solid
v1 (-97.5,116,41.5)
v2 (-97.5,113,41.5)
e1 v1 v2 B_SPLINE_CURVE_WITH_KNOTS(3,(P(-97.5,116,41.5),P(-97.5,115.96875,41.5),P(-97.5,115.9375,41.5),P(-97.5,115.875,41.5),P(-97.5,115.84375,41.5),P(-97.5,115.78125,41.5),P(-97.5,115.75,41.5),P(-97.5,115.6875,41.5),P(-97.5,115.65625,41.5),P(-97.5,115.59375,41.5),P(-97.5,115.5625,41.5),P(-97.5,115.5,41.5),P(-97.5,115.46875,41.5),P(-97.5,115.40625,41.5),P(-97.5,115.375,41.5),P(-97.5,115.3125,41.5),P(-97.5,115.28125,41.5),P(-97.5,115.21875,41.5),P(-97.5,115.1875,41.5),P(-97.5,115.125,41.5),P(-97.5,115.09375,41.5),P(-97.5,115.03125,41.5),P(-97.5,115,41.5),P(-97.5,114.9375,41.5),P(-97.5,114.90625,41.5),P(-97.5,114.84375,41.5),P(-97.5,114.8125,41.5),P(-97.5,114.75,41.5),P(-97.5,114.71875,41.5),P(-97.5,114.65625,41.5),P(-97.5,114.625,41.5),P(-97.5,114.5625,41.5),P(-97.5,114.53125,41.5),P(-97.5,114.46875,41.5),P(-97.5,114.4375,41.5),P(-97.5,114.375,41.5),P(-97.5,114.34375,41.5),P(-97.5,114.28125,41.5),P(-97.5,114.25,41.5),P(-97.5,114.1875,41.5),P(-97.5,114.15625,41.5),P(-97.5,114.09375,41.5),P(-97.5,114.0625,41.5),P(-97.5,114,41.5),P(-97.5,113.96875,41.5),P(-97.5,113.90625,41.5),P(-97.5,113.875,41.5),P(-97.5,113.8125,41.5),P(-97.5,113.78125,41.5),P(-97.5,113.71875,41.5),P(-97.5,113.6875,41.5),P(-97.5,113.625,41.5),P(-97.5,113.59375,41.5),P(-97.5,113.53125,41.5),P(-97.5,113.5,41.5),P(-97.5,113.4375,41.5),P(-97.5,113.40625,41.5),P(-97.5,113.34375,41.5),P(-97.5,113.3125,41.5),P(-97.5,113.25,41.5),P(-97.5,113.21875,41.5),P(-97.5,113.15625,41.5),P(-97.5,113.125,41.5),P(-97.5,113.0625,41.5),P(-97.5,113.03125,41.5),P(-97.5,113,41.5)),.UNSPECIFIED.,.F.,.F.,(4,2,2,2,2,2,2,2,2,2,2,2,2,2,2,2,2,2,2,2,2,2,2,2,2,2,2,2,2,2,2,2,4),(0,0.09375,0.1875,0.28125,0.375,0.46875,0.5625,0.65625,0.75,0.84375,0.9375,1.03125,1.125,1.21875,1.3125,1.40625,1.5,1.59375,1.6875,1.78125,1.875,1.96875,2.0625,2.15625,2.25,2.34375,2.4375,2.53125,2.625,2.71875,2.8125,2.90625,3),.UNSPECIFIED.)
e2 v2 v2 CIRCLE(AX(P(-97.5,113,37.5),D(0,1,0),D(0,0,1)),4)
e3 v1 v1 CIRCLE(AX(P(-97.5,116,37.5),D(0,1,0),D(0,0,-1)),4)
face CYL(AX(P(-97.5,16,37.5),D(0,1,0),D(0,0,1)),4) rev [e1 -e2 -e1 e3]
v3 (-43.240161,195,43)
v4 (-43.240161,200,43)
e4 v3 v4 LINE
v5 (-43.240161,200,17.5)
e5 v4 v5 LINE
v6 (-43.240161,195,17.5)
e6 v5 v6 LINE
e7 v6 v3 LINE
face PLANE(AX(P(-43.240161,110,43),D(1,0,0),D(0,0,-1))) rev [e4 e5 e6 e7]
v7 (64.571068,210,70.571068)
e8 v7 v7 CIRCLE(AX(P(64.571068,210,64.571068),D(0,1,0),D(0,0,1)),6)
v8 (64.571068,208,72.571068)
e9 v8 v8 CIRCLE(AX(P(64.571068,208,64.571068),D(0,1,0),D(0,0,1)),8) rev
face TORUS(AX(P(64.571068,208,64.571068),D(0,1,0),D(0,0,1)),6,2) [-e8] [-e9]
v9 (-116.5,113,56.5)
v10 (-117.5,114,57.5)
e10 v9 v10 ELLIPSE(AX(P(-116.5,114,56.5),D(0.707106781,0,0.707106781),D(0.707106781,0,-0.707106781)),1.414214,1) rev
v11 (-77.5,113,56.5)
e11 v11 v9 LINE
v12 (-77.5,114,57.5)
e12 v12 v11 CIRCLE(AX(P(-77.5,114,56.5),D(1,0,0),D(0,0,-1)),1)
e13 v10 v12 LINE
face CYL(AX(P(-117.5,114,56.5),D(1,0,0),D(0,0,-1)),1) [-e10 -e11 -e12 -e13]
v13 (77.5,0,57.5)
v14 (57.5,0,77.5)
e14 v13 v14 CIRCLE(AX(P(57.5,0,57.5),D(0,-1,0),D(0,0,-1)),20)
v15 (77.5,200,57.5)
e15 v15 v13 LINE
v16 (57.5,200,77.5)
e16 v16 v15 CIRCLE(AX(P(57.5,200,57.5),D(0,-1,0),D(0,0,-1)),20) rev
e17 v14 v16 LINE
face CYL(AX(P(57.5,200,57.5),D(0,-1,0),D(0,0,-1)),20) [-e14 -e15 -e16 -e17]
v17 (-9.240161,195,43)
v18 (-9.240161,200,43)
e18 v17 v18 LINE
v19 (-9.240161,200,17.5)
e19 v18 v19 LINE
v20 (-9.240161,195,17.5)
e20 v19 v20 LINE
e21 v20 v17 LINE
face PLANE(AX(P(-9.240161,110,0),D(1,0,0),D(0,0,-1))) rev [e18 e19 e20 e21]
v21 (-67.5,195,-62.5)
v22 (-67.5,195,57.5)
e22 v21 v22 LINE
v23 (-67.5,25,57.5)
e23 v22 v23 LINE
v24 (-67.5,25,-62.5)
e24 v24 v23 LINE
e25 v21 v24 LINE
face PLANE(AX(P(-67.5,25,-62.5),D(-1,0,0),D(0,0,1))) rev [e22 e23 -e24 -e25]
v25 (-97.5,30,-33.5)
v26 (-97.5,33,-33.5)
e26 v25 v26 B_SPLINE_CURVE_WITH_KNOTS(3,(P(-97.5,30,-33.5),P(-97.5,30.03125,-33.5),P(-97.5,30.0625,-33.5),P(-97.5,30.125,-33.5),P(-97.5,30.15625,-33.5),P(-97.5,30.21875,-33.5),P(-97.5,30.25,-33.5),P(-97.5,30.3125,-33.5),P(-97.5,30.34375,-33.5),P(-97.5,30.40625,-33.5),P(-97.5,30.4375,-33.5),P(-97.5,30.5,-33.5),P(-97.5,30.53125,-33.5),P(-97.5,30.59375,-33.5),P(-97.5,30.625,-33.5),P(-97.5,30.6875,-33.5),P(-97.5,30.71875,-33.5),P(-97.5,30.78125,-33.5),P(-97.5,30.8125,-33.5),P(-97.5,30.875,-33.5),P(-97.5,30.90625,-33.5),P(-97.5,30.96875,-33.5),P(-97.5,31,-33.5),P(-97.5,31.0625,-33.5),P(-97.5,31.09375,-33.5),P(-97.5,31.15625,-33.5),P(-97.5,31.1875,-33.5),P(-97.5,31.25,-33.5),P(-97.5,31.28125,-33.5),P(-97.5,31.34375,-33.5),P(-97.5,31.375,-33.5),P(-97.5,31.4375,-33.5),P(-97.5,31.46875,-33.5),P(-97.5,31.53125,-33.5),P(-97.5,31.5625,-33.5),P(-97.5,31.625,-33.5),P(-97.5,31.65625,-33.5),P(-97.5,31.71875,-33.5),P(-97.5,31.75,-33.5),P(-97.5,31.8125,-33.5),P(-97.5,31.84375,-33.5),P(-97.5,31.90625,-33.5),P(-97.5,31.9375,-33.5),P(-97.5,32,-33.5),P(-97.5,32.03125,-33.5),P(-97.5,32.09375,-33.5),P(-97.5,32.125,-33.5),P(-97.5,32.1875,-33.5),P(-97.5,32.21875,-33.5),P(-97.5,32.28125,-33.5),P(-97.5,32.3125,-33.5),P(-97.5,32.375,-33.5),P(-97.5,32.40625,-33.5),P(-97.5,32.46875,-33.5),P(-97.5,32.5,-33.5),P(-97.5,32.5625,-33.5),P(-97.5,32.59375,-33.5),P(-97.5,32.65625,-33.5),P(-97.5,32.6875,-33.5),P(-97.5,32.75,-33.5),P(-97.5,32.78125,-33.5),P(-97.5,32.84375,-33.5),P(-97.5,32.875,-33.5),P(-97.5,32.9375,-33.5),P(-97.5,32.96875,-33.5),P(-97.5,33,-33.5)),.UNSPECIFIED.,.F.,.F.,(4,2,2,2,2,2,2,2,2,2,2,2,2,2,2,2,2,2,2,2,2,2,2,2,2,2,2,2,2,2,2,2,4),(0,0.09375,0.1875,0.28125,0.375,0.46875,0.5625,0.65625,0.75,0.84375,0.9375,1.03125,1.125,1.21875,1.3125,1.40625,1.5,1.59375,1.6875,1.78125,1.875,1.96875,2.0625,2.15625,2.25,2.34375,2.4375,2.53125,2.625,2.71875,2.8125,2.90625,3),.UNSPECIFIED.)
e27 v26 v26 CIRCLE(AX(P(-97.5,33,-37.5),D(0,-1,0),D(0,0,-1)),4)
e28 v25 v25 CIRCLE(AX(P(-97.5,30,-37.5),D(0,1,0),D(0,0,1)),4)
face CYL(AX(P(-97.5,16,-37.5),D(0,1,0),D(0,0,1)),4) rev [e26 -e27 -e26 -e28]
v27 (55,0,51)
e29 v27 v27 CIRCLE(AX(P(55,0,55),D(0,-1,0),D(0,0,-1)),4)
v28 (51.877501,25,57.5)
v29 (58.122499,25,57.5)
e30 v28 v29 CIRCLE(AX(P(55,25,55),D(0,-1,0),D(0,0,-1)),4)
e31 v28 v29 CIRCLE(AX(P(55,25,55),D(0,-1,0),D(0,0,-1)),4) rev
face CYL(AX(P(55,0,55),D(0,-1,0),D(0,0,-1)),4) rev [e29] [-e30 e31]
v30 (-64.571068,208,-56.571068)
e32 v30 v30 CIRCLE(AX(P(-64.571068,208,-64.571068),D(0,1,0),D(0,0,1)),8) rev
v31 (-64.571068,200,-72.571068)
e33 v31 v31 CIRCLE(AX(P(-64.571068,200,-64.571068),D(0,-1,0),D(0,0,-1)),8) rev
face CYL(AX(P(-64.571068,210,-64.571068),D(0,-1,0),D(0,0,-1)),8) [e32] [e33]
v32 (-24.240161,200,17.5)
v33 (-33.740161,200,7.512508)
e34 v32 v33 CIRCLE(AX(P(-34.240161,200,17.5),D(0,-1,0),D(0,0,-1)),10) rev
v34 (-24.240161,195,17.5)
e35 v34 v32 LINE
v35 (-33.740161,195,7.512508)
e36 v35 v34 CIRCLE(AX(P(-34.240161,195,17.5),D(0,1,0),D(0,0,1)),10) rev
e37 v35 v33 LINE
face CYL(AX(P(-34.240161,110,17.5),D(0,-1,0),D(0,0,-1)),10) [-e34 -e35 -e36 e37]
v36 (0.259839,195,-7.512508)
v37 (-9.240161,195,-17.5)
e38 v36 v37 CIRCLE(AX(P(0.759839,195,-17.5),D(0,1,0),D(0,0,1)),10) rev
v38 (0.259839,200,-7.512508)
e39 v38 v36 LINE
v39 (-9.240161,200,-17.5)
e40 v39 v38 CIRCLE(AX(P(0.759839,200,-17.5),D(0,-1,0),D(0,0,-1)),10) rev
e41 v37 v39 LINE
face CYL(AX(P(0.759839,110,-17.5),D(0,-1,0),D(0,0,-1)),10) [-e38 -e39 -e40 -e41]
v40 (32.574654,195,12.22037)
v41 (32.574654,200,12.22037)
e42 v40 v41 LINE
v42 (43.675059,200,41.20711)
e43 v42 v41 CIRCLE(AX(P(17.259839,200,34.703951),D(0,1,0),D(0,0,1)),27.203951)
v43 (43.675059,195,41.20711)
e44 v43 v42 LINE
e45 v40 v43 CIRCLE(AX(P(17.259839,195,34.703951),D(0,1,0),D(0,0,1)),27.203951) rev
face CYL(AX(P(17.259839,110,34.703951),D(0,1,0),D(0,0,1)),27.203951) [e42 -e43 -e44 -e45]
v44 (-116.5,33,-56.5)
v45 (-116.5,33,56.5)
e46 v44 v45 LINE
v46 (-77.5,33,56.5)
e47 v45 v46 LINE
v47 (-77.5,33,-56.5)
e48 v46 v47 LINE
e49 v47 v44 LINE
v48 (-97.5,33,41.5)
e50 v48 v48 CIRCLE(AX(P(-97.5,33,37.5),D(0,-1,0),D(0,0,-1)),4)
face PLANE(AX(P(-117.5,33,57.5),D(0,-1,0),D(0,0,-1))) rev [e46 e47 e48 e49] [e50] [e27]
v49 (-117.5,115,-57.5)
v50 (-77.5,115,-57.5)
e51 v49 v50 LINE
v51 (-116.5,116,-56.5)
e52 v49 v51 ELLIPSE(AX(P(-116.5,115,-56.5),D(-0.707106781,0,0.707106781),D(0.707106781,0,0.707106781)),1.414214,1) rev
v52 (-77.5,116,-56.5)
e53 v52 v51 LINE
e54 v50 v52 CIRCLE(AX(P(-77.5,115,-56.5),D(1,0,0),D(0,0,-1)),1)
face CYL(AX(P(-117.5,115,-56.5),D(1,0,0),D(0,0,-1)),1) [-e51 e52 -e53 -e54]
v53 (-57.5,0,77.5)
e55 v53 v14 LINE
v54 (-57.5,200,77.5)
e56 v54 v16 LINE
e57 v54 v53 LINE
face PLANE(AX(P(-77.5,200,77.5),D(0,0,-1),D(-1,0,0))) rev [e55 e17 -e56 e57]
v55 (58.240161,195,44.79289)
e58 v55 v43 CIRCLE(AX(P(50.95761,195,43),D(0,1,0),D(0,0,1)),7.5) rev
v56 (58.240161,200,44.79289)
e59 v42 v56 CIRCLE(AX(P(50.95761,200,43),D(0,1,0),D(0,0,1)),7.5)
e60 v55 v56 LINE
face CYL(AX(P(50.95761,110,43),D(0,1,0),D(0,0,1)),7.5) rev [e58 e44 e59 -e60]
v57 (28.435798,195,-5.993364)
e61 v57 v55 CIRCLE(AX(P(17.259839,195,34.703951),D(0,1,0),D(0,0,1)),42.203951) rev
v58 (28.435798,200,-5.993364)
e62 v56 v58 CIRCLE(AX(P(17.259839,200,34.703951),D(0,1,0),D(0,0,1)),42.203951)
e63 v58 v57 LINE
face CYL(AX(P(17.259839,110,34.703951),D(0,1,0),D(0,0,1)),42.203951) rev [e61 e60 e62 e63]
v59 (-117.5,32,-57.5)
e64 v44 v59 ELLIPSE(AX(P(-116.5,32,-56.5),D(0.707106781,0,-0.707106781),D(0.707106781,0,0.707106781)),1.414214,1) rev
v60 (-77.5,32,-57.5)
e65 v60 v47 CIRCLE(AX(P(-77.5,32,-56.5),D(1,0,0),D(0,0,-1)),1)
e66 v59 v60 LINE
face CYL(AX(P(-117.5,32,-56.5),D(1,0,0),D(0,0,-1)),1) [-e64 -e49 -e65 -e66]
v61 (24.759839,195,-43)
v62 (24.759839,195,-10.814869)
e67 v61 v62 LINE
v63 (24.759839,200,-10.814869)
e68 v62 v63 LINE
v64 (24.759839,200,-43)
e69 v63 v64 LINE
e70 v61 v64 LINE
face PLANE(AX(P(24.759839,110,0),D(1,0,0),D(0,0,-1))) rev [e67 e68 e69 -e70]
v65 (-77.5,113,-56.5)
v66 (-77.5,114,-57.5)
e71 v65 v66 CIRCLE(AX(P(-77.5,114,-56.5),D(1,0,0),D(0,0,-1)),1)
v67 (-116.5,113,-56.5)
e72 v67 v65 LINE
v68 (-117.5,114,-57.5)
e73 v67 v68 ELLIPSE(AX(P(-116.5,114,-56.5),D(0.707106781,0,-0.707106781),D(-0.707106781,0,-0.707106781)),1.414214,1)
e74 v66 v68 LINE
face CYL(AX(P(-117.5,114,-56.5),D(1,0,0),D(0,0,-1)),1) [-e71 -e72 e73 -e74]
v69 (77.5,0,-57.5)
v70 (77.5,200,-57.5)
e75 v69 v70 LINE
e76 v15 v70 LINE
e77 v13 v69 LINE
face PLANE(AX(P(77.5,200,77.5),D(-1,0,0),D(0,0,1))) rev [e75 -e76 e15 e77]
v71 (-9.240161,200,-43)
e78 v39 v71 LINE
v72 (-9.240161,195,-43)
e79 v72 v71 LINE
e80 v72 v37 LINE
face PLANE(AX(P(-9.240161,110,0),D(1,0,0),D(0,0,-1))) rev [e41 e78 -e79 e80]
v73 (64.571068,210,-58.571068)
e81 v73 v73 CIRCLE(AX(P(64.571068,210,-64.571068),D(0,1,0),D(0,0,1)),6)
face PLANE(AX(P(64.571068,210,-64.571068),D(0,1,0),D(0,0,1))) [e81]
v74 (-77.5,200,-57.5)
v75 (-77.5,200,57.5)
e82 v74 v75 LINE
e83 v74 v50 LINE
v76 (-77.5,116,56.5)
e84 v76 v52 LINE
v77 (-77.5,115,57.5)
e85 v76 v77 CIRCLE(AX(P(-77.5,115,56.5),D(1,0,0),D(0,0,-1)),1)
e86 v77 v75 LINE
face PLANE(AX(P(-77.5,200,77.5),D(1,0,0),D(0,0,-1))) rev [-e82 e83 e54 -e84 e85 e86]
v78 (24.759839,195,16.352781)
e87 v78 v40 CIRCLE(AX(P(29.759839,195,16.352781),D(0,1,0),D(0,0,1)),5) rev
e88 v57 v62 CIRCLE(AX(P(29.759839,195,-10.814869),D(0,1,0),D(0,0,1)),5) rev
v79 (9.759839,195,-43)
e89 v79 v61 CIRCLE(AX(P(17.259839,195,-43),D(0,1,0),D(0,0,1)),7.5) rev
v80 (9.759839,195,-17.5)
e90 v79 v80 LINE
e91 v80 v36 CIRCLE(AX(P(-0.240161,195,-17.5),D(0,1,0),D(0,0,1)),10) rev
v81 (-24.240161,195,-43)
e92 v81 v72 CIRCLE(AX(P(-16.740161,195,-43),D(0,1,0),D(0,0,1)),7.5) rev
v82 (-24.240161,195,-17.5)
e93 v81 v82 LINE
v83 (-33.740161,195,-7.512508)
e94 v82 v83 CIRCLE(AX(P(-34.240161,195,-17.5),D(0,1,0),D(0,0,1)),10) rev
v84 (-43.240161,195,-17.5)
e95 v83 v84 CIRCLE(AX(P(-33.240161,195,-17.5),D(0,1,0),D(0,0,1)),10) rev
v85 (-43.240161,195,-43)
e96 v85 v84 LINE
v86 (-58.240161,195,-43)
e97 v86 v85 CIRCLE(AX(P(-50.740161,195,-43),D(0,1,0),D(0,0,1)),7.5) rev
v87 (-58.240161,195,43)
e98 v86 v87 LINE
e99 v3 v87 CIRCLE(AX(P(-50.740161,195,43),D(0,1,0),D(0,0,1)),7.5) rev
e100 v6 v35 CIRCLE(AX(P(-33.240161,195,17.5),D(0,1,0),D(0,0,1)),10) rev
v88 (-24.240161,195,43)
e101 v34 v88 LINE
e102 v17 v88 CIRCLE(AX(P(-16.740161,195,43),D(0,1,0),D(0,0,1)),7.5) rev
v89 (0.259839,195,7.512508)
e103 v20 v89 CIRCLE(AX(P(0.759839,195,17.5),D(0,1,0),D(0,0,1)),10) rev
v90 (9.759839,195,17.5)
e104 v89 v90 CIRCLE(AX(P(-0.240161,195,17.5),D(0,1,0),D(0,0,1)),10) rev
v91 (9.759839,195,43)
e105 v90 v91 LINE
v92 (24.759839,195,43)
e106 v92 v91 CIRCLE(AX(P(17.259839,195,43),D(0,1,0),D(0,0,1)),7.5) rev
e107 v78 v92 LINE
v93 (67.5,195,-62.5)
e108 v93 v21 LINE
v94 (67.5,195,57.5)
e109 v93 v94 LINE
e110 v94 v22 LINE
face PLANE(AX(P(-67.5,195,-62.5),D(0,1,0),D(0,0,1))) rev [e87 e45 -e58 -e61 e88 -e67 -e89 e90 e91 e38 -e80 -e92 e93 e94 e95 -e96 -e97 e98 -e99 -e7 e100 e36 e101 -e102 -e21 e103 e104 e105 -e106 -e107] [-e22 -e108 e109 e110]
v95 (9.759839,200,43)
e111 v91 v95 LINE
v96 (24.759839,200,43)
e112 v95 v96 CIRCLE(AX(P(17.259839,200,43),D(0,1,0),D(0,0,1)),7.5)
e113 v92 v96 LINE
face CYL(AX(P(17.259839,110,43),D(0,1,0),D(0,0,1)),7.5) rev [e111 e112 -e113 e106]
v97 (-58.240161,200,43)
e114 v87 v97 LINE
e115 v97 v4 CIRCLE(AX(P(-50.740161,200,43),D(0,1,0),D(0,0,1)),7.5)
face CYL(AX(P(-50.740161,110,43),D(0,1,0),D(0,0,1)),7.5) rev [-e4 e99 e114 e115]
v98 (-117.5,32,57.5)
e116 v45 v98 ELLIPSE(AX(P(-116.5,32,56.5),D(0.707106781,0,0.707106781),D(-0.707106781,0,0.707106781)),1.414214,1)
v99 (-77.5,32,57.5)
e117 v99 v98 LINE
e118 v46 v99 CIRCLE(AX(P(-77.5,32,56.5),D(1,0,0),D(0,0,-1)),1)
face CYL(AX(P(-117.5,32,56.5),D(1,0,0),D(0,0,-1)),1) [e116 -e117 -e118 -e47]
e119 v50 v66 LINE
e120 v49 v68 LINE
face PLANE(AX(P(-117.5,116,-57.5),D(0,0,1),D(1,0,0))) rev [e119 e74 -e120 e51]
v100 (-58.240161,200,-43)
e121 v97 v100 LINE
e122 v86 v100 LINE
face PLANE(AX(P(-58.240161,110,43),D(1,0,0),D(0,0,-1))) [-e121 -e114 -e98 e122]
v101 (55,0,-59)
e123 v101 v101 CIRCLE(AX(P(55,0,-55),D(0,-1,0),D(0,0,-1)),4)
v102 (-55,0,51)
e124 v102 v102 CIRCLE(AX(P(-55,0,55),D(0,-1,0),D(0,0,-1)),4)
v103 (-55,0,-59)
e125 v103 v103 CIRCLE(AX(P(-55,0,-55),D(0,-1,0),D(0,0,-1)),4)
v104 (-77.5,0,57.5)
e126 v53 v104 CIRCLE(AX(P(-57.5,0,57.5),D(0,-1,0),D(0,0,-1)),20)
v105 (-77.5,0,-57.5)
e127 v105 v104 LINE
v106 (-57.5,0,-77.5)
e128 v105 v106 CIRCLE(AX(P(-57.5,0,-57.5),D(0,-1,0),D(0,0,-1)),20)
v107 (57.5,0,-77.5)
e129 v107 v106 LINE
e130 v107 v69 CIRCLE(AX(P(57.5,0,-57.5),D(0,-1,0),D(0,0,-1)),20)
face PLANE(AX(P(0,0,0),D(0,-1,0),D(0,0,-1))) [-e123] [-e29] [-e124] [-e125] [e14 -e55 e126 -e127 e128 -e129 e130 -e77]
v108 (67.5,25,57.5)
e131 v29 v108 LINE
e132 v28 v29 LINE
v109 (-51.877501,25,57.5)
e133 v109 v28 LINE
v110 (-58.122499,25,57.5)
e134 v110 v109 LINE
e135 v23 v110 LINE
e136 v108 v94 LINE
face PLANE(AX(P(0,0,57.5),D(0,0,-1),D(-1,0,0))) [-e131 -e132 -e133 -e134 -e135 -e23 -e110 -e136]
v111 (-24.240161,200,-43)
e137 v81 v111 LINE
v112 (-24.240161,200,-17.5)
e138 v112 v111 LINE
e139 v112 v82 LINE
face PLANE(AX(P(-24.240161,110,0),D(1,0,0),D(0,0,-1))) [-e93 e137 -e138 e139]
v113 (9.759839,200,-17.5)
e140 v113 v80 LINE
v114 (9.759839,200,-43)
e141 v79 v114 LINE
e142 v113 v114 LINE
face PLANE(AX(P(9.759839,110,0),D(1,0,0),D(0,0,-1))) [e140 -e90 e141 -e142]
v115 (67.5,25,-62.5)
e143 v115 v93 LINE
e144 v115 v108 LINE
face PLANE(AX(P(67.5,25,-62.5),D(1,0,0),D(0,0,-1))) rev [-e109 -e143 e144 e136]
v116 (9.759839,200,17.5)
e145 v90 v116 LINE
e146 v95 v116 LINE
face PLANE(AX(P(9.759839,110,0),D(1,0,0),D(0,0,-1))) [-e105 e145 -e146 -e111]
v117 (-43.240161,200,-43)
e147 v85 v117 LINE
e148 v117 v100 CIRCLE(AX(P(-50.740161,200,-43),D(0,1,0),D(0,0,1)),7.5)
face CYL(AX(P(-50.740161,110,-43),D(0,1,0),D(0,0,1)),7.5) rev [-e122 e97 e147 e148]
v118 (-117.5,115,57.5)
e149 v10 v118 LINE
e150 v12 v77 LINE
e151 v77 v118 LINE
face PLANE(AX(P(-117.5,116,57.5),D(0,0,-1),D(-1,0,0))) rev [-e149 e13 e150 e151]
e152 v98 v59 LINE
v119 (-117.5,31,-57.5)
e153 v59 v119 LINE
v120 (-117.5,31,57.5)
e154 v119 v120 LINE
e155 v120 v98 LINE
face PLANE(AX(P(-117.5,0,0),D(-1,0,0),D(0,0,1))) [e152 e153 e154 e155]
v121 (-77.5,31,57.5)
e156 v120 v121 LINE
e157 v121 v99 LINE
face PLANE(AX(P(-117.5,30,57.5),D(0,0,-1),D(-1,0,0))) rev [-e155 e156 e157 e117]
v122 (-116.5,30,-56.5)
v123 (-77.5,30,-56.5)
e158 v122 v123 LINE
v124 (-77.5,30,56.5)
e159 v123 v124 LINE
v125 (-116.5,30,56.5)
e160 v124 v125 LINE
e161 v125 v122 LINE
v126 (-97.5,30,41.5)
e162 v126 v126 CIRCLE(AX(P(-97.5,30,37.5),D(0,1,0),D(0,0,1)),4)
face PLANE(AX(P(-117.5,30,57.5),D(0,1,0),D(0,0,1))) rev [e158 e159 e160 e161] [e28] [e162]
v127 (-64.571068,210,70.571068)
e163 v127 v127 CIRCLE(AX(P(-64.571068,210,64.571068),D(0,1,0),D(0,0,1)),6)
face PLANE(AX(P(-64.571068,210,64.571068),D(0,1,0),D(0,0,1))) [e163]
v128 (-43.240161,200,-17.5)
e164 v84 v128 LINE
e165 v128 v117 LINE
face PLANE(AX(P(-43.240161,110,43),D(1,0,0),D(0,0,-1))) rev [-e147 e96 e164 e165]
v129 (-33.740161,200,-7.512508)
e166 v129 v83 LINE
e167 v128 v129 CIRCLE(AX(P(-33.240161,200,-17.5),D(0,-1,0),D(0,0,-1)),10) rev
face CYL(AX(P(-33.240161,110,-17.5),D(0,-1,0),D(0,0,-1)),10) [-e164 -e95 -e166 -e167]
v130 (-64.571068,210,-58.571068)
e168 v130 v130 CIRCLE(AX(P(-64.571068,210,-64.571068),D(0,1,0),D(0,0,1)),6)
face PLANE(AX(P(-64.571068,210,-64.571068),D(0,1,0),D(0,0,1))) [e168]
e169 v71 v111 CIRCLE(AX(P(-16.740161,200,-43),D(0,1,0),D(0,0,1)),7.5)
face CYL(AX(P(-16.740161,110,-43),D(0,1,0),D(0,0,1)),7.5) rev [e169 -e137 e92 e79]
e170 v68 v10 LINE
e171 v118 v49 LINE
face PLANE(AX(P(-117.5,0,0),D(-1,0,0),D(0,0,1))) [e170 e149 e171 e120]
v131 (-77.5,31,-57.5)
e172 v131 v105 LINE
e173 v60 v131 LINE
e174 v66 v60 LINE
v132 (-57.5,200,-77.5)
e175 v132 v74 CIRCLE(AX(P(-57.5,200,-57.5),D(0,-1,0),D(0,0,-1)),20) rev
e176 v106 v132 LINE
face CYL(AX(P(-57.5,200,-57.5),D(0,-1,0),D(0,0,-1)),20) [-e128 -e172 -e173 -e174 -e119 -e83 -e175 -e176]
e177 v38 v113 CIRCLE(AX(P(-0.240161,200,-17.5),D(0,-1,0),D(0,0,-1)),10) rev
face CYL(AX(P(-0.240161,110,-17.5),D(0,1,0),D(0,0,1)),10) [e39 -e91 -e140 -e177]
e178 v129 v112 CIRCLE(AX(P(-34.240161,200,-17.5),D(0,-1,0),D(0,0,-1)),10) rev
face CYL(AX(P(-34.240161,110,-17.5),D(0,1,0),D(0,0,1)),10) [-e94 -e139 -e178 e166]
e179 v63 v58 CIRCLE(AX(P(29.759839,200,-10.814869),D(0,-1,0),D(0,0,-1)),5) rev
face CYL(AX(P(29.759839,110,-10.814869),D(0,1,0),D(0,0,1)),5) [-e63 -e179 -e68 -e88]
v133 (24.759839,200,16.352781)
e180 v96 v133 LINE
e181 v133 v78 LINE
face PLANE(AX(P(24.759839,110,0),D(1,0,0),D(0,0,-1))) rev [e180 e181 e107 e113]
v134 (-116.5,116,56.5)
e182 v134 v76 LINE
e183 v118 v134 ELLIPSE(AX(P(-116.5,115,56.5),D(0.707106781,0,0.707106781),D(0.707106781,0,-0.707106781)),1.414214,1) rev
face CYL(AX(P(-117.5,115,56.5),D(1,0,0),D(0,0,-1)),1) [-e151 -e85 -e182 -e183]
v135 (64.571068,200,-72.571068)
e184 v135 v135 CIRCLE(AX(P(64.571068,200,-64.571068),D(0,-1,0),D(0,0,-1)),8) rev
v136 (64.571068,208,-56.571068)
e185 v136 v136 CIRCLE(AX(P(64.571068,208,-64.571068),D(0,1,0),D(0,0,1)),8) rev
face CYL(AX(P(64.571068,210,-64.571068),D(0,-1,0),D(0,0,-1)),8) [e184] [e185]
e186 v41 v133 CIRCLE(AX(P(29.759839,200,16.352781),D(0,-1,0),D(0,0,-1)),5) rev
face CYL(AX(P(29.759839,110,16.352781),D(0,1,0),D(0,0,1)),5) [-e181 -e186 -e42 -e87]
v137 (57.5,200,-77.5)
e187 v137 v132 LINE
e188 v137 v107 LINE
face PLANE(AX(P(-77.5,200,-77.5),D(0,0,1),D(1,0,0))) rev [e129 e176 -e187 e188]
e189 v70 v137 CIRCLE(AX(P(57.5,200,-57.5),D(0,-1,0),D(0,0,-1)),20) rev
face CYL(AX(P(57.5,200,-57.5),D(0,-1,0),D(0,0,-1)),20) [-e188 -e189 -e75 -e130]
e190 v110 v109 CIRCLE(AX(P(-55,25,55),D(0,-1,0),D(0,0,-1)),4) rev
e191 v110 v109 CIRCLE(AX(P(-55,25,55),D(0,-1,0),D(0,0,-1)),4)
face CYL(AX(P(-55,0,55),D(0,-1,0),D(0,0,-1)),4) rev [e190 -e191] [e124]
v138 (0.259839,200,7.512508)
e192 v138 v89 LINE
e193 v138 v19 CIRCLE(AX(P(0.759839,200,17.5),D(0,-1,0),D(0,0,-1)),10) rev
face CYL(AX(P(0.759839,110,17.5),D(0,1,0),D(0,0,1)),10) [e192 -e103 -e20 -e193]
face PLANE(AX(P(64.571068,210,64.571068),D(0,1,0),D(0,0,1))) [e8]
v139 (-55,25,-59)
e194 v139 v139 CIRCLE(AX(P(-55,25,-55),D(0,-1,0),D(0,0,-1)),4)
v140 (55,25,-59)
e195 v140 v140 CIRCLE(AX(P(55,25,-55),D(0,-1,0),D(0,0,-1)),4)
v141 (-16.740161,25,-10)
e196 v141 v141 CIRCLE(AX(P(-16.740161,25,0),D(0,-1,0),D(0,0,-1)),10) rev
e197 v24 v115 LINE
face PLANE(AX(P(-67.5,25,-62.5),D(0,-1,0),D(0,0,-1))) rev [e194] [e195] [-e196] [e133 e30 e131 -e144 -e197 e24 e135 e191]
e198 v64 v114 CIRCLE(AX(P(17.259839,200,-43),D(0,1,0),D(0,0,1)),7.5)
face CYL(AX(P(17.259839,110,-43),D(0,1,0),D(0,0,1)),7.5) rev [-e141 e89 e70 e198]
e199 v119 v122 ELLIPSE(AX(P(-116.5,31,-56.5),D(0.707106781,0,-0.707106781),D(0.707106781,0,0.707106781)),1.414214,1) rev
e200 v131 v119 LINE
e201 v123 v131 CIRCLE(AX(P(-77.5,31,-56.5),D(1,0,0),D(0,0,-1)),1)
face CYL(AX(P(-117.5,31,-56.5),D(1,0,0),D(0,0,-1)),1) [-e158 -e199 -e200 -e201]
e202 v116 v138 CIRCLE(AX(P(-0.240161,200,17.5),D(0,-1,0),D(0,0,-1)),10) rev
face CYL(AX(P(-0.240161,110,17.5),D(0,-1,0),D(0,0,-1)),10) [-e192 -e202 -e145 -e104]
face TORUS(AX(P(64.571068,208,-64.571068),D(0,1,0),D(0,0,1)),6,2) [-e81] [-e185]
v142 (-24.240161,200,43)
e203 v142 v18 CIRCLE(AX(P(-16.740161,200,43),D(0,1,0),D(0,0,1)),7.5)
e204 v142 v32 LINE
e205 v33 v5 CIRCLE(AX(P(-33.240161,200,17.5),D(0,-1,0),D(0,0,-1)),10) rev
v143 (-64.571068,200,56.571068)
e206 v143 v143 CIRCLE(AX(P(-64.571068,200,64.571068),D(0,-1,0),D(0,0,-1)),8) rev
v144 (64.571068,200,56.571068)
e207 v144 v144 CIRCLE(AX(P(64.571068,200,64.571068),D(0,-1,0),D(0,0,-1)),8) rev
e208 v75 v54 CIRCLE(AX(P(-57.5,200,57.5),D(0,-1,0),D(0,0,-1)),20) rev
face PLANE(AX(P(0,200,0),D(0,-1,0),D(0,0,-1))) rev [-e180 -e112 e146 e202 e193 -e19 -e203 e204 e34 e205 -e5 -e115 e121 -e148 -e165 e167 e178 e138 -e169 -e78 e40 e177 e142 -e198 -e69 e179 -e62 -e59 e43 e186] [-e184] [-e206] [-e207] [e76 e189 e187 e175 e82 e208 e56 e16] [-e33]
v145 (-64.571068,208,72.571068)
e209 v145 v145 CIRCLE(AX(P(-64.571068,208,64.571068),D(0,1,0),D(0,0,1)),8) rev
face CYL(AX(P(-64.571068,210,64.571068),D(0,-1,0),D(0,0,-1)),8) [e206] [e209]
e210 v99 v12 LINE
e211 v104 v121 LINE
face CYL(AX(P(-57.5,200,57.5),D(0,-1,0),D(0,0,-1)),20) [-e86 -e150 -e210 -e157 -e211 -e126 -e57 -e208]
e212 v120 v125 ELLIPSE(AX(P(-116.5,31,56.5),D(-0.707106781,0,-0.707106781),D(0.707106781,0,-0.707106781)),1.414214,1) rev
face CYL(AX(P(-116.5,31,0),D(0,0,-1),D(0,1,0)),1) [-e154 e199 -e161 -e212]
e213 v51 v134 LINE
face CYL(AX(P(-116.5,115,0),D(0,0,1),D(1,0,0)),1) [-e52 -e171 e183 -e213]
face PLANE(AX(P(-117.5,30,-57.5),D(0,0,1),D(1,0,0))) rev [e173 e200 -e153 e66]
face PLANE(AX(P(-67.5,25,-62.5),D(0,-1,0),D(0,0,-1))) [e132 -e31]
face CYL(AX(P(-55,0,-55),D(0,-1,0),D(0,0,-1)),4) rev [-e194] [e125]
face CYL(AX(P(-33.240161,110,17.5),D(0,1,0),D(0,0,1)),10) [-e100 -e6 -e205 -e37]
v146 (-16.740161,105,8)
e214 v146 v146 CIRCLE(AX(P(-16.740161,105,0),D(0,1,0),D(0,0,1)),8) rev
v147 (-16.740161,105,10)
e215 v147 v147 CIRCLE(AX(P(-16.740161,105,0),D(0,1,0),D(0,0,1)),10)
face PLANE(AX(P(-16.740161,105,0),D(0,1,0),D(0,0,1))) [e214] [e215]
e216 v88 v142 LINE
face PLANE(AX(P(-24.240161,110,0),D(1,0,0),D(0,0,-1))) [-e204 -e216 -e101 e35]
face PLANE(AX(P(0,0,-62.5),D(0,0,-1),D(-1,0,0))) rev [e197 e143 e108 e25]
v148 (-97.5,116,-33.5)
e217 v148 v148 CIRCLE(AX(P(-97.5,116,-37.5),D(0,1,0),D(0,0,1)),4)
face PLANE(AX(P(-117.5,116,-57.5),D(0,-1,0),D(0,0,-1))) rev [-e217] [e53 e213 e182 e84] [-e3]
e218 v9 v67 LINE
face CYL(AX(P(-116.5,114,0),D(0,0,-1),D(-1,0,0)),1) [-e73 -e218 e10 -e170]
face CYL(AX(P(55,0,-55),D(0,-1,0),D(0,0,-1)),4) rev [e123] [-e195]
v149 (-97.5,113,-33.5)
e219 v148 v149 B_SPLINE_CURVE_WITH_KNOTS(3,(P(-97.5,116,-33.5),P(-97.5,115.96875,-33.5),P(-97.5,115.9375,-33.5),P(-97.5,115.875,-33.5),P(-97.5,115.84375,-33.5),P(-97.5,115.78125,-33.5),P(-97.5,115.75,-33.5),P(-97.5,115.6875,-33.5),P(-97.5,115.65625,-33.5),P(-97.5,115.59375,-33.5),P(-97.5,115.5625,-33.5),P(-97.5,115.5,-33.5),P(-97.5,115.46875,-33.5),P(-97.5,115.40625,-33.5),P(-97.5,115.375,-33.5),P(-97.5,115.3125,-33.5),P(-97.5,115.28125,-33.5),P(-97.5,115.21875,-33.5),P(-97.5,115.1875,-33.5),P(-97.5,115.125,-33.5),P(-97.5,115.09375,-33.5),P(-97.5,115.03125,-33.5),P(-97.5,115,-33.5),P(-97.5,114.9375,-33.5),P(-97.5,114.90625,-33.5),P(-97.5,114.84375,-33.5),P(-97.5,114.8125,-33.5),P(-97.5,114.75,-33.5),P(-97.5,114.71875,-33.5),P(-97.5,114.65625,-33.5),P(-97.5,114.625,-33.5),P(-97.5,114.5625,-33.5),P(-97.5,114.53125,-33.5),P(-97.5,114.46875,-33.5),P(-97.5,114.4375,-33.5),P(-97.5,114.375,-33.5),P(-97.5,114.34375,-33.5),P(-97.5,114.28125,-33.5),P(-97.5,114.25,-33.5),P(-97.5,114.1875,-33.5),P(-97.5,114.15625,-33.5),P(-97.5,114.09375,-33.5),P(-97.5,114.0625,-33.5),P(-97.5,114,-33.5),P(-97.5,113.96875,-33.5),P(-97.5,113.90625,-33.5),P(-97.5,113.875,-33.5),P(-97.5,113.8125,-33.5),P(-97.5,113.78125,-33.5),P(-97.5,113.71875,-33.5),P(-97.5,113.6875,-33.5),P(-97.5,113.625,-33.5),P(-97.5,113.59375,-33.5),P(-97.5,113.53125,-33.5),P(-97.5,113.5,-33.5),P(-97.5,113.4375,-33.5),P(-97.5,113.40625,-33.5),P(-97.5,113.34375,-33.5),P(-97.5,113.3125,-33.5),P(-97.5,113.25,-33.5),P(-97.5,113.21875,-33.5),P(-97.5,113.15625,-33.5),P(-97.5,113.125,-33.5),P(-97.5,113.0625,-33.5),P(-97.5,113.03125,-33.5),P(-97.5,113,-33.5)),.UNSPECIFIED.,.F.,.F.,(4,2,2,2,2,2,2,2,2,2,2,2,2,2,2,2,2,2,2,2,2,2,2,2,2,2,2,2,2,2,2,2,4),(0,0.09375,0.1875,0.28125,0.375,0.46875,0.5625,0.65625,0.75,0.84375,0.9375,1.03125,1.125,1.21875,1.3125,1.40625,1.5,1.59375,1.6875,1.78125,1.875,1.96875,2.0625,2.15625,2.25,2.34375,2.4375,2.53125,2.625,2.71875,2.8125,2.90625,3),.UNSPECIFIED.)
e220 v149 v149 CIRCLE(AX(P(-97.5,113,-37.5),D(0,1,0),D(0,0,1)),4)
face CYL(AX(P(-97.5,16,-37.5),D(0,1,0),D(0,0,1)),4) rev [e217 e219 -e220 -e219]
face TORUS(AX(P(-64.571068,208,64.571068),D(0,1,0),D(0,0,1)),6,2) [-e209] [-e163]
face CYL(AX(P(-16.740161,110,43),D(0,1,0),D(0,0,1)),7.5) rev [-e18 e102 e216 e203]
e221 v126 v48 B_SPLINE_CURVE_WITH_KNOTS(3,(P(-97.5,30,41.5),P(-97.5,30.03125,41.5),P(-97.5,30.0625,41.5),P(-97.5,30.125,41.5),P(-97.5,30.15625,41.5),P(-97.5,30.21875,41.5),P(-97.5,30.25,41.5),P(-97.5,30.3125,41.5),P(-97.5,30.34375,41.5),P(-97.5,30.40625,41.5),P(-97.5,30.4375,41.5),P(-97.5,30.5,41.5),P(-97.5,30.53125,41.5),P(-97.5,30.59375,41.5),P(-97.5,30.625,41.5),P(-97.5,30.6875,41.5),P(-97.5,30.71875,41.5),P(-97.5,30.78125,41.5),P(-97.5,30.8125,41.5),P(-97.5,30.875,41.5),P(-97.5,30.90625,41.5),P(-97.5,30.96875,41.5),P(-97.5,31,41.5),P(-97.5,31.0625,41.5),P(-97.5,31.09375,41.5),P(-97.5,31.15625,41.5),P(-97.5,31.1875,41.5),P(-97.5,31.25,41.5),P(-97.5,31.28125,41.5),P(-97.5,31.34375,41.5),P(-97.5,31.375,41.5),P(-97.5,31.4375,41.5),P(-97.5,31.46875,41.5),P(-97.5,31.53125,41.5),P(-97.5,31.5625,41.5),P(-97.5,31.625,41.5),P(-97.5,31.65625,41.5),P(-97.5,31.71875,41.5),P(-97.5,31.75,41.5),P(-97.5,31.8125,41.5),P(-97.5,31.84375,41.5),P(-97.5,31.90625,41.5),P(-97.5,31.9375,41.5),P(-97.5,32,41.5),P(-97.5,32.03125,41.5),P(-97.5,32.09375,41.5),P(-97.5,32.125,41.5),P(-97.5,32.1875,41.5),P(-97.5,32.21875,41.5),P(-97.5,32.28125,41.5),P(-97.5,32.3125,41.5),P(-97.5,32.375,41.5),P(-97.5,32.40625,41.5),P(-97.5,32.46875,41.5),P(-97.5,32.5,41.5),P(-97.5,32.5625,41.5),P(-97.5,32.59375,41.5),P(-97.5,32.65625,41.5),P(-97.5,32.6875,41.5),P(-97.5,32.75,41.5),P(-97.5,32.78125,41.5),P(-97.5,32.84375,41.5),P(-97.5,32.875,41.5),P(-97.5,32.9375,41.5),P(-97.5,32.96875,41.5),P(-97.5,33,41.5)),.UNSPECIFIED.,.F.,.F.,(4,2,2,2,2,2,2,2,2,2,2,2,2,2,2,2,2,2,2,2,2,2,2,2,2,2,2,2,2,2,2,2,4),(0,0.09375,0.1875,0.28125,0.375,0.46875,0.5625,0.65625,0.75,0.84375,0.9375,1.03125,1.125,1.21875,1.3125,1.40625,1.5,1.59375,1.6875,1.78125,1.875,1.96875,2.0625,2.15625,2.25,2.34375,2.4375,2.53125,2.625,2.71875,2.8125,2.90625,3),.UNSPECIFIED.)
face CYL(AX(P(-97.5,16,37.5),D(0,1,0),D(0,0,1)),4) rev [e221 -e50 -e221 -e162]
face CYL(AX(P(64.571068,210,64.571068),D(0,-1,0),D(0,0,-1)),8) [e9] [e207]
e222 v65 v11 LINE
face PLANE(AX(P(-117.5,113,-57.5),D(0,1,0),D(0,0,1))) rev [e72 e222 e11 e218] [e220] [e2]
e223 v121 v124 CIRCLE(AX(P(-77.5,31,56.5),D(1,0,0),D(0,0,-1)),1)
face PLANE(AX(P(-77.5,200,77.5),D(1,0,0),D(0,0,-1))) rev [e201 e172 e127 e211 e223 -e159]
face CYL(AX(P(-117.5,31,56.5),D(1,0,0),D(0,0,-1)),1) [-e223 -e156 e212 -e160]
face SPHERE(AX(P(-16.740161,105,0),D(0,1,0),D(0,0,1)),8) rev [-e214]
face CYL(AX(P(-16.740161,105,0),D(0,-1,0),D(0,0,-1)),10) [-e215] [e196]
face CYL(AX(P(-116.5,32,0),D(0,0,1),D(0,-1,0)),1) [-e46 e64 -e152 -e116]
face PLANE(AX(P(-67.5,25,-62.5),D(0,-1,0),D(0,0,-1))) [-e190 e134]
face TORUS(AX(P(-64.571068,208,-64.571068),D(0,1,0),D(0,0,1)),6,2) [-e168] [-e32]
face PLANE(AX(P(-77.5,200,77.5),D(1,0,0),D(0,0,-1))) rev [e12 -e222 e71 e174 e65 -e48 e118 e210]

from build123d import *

# Parameters (mm, degrees)
SZKIC1_W                       = 155
SZKIC1_H                       = 155
DODANIE_WYCI_GNI_CIE1_DEPTH    = 200
SZKIC2_W                       = 19
SZKIC2_H                       = 15
SZKIC2_W_2                     = 15
WYTNIJ_WYCI_GNI_CIE1_DEPTH     = 90
ZAOKR_GLENIE1_R                = 20
SZKIC4_R                       = 8
DODANIE_WYCI_GNI_CIE2_DEPTH    = 10
ZAOKR_GLENIE2_R                = 2
SZKIC5_W                       = 135
SZKIC5_H                       = 170
WYTNIJ_WYCI_GNI_CIE2_DEPTH     = 120
SZKIC6_R                       = 10
DODANIE_WYCI_GNI_CIE3_DEPTH    = 80
SZKIC8_W                       = 115
SZKIC8_H                       = 3
DODANIE_WYCI_GNI_CIE4_DEPTH    = 40
SZKIC9_R                       = 4
WYTNIJ_WYCI_GNI_CIE3_DEPTH     = 100
ZAOKR_GLENIE3_R                = 1
OTWORY_USTALAJ_CE_8_0MM1_D     = 8
OTWORY_USTALAJ_CE_8_0MM1_DEPTH = 25
ZAOKR_GLENIE4_R                = 10
ZAOKR_GLENIE5_R                = 5


with BuildPart() as part:
    # Szkic1 → Dodanie-wyciągnięcie1 (new body)
    with BuildSketch(Plane(origin=(0, 0, 0), x_dir=(1, 0, 0), z_dir=(0, 1, 0))):
        Rectangle(SZKIC1_W, SZKIC1_H)
    extrude(amount=DODANIE_WYCI_GNI_CIE1_DEPTH)

    # Szkic2 → Wytnij-wyciągnięcie1 (cut)
    with BuildSketch(Plane(origin=(0, 200, 0), x_dir=(1, 0, 0), z_dir=(0, 1, 0))):
        with BuildLine():
            Line((-58.240160679, 43), (-58.240160679, -43))
            ThreePointArc((-58.240160679, -43), (-50.740160679, -50.5), (-43.240160679, -43))
            Line((-43.240160679, -43), (-43.240160679, -7.5))
            Line((-43.240160679, -7.5), (-43.240160679, 7.5))
            Line((-43.240160679, 7.5), (-43.240160679, 43))
            ThreePointArc((-43.240160679, 43), (-50.740160679, 50.5), (-58.240160679, 43))
        make_face()
        with Locations((-33.740160679, 0)):
            Rectangle(SZKIC2_W, SZKIC2_H)
        with BuildLine():
            Line((-9.240160679, -7.5), (-24.240160679, -7.5))
            Line((-24.240160679, -7.5), (-24.240160679, -43))
            ThreePointArc((-24.240160679, -43), (-16.740160679, -50.5), (-9.240160679, -43))
            Line((-9.240160679, -43), (-9.240160679, -7.5))
        make_face()
        with Locations((-16.740160679, 0)):
            Rectangle(SZKIC2_W_2, SZKIC2_H)
        with BuildLine():
            Line((-24.240160679, 43), (-24.240160679, 7.5))
            Line((-24.240160679, 7.5), (-9.240160679, 7.5))
            Line((-9.240160679, 7.5), (-9.240160679, 43))
            ThreePointArc((-9.240160679, 43), (-16.740160679, 50.5), (-24.240160679, 43))
        make_face()
        Polygon((-9.240160679, 7.5), (-9.240160679, -7.5), (9.759839321, -7.5), (9.759839321, -4.6e-08), (9.759839321, 7.5), align=None)
        with BuildLine():
            Line((17.259839321, -7.5), (9.759839321, -7.5))
            Line((9.759839321, -7.5), (9.759839321, -43))
            ThreePointArc((9.759839321, -43), (17.259839321, -50.5), (24.759839321, -43))
            Line((24.759839321, -43), (24.759839321, -8.554286585))
            ThreePointArc((24.759839321, -8.554286585), (21.046708747, -7.764861006), (17.259839321, -7.5))
        make_face()
        with BuildLine():
            Line((9.759839321, -4.6e-08), (9.759839321, -7.5))
            Line((9.759839321, -7.5), (17.259839321, -7.5))
            ThreePointArc((17.259839321, -7.5), (11.956538478, -5.303300875), (9.759839321, -4.6e-08))
        make_face()
        with BuildLine():
            Line((17.259839321, 7.5), (9.759839321, 7.5))
            Line((9.759839321, 7.5), (9.759839321, -4.6e-08))
            ThreePointArc((9.759839321, -4.6e-08), (11.956538445, 5.303300843), (17.259839321, 7.5))
        make_face()
        with BuildLine():
            Line((9.759839321, 43), (9.759839321, 7.5))
            Line((9.759839321, 7.5), (17.259839321, 7.5))
            ThreePointArc((17.259839321, 7.5), (21.024851006, 7.331726309), (24.759839321, 6.828247104))
            Line((24.759839321, 6.828247104), (24.759839321, 43))
            ThreePointArc((24.759839321, 43), (17.259839321, 50.5), (9.759839321, 43))
        make_face()
        with BuildLine():
            ThreePointArc((17.259839321, 7.5), (11.956538445, 5.303300843), (9.759839321, -4.6e-08))
            ThreePointArc((9.759839321, -4.6e-08), (11.956538478, -5.303300875), (17.259839321, -7.5))
            Line((17.259839321, -7.5), (17.259839321, 7.5))
        make_face()
        with BuildLine():
            Line((17.259839321, 7.5), (17.259839321, -7.5))
            ThreePointArc((17.259839321, -7.5), (21.046708747, -7.764861006), (24.759839321, -8.554286585))
            Line((24.759839321, -8.554286585), (24.759839321, 6.828247104))
            ThreePointArc((24.759839321, 6.828247104), (21.024851006, 7.331726309), (17.259839321, 7.5))
        make_face()
        with BuildLine():
            Line((24.759839321, 6.828247104), (24.759839321, -8.554286585))
            ThreePointArc((24.759839321, -8.554286585), (40.799428369, -21.067870737), (43.675059249, -41.207109854))
            ThreePointArc((43.675059249, -41.207109854), (49.164719818, -50.282550715), (58.240160679, -44.792890146))
            ThreePointArc((58.240160679, -44.792890146), (52.668465989, -11.738702912), (24.759839321, 6.828247104))
        make_face()
    extrude(amount=-WYTNIJ_WYCI_GNI_CIE1_DEPTH, mode=Mode.SUBTRACT)

    # Zaokrąglenie1
    zaokr_glenie1_edges = [part.edges().sort_by_distance(p)[0] for p in [
        (77.5, 100, 77.5),
        (-77.5, 100, 77.5),
        (-77.5, 100, -77.5),
        (77.5, 100, -77.5),
    ]]
    fillet(zaokr_glenie1_edges, radius=ZAOKR_GLENIE1_R)

    # Szkic4 → Dodanie-wyciągnięcie2 (add)
    with BuildSketch(Plane(origin=(0, 200, 0), x_dir=(1, 0, 0), z_dir=(0, 1, 0))):
        with Locations(Location((-64.571067812, -64.571067812, 0), (0, 0, 90))):
            Circle(SZKIC4_R)
        with Locations(Location((-64.571067812, 64.571067812, 0), (0, 0, 90))):
            Circle(SZKIC4_R)
        with Locations(Location((64.571067812, 64.571067812, 0), (0, 0, 90))):
            Circle(SZKIC4_R)
        with Locations(Location((64.571067812, -64.571067812, 0), (0, 0, 90))):
            Circle(SZKIC4_R)
    extrude(amount=DODANIE_WYCI_GNI_CIE2_DEPTH)

    # Zaokrąglenie2
    zaokr_glenie2_edges = [part.edges().sort_by_distance(p)[0] for p in [
        (-64.571067812, 210, 72.571067812),
        (-64.571067812, 210, -56.571067812),
        (64.571067812, 210, -56.571067812),
        (64.571067812, 210, 72.571067812),
    ]]
    fillet(zaokr_glenie2_edges, radius=ZAOKR_GLENIE2_R)

    # Szkic5 → Wytnij-wyciągnięcie2 (cut)
    with BuildSketch(Plane.XY.offset(57.5)):
        with Locations((0, 110)):
            Rectangle(SZKIC5_W, SZKIC5_H)
    extrude(amount=-WYTNIJ_WYCI_GNI_CIE2_DEPTH, mode=Mode.SUBTRACT)

    # Szkic6 → Dodanie-wyciągnięcie3 (add)
    with BuildSketch(Plane(origin=(0, 25, 0), x_dir=(1, 0, 0), z_dir=(0, 1, 0))):
        with Locations(Location((-16.740160679, 0, 0), (0, 0, 90))):
            Circle(SZKIC6_R)
    extrude(amount=DODANIE_WYCI_GNI_CIE3_DEPTH)

    # Szkic7 → Wycięcie-obrót1 (revolve, cut)
    with BuildSketch(Plane(origin=(0, 105, 0), x_dir=(1, 0, 0), z_dir=(0, 1, 0))):
        with BuildLine():
            Line((-16.740160679, 8), (-16.740160679, -8))
            ThreePointArc((-16.740160679, -8), (-8.740160679, 0), (-16.740160679, 8))
        make_face()
    revolve(axis=Axis((-16.740160679, 105, -8), (0, 0, 1)), mode=Mode.SUBTRACT)

    # Szkic8 → Dodanie-wyciągnięcie4 (add)
    with BuildSketch(Plane.ZY.offset(77.5)):
        with Locations((0, 114.5)):
            Rectangle(SZKIC8_W, SZKIC8_H)
        with Locations((0, 31.5)):
            Rectangle(SZKIC8_W, SZKIC8_H)
    extrude(amount=DODANIE_WYCI_GNI_CIE4_DEPTH)

    # Szkic9 → Wytnij-wyciągnięcie3 (cut)
    with BuildSketch(Plane(origin=(0, 116, 0), x_dir=(1, 0, 0), z_dir=(0, 1, 0))):
        with Locations(Location((-97.5, 37.5, 0), (0, 0, 270))):
            Circle(SZKIC9_R)
        with Locations(Location((-97.5, -37.5, 0), (0, 0, 270))):
            Circle(SZKIC9_R)
    extrude(amount=-WYTNIJ_WYCI_GNI_CIE3_DEPTH, mode=Mode.SUBTRACT)

    # Zaokrąglenie3
    zaokr_glenie3_edges = [part.edges().sort_by_distance(p)[0] for p in [
        (-97.5, 116, -57.5),
        (-97.5, 113, -57.5),
        (-97.5, 113, 57.5),
        (-97.5, 116, 57.5),
        (-117.5, 113, 0),
        (-117.5, 116, 0),
        (-97.5, 30, 57.5),
        (-97.5, 33, 57.5),
        (-97.5, 33, -57.5),
        (-97.5, 30, -57.5),
        (-117.5, 33, 0),
        (-117.5, 30, 0),
    ]]
    fillet(zaokr_glenie3_edges, radius=ZAOKR_GLENIE3_R)

    # Otwory ustalające Ø8.0mm1
    with Locations(Plane(origin=(0, 0, 0), x_dir=(-1, 0, 0), z_dir=(0, -1, 0))):
        with Locations((55, 55), (55, -55), (-55, -55), (-55, 55)):
            Hole(OTWORY_USTALAJ_CE_8_0MM1_D / 2, depth=OTWORY_USTALAJ_CE_8_0MM1_DEPTH)

    # Zaokrąglenie4
    # the kernel refuses this fillet: 10 mm, written as the material it takes off along each edge
    with BuildSketch(Plane(origin=(-9.240160679, 225, 7.5), x_dir=(0, 0, 1), z_dir=(0, -1, 0)), Plane(origin=(9.759839321, 225, 7.5), x_dir=(-1, 0, 0), z_dir=(0, -1, 0)), Plane(origin=(-24.240160679, 225, 7.5), x_dir=(-1, 0, 0), z_dir=(0, -1, 0)), Plane(origin=(-43.240160679, 225, 7.5), x_dir=(0, 0, 1), z_dir=(0, -1, 0))) as zaokr_glenie4_piece_1:
        with BuildLine():
            CenterArc((ZAOKR_GLENIE4_R, -ZAOKR_GLENIE4_R), ZAOKR_GLENIE4_R, 90, 90)
            Line((0, -ZAOKR_GLENIE4_R), (0, 0))
            Line((0, 0), (ZAOKR_GLENIE4_R, 0))
        make_face()
    extrude(amount=55, mode=Mode.SUBTRACT)
    with BuildSketch(Plane(origin=(9.759839321, 225, -7.5), x_dir=(-1, 0, 0), z_dir=(0, -1, 0)), Plane(origin=(-9.240160679, 225, -7.5), x_dir=(0, 0, -1), z_dir=(0, -1, 0)), Plane(origin=(-24.240160679, 225, -7.5), x_dir=(-1, 0, 0), z_dir=(0, -1, 0)), Plane(origin=(-43.240160679, 225, -7.5), x_dir=(0, 0, -1), z_dir=(0, -1, 0))) as zaokr_glenie4_piece_2:
        with BuildLine():
            CenterArc((ZAOKR_GLENIE4_R, ZAOKR_GLENIE4_R), ZAOKR_GLENIE4_R, 180, 90)
            Line((0, ZAOKR_GLENIE4_R), (0, 0))
            Line((0, 0), (ZAOKR_GLENIE4_R, 0))
        make_face()
    extrude(amount=55, mode=Mode.SUBTRACT)

    # Zaokrąglenie5
    zaokr_glenie5_edges = [part.edges().sort_by_distance(p)[0] for p in [
        (24.759839321, 197.5, 8.554286585),
        (24.759839321, 197.5, -6.828247104),
    ]]
    fillet(zaokr_glenie5_edges, radius=ZAOKR_GLENIE5_R)


solid = part.part
